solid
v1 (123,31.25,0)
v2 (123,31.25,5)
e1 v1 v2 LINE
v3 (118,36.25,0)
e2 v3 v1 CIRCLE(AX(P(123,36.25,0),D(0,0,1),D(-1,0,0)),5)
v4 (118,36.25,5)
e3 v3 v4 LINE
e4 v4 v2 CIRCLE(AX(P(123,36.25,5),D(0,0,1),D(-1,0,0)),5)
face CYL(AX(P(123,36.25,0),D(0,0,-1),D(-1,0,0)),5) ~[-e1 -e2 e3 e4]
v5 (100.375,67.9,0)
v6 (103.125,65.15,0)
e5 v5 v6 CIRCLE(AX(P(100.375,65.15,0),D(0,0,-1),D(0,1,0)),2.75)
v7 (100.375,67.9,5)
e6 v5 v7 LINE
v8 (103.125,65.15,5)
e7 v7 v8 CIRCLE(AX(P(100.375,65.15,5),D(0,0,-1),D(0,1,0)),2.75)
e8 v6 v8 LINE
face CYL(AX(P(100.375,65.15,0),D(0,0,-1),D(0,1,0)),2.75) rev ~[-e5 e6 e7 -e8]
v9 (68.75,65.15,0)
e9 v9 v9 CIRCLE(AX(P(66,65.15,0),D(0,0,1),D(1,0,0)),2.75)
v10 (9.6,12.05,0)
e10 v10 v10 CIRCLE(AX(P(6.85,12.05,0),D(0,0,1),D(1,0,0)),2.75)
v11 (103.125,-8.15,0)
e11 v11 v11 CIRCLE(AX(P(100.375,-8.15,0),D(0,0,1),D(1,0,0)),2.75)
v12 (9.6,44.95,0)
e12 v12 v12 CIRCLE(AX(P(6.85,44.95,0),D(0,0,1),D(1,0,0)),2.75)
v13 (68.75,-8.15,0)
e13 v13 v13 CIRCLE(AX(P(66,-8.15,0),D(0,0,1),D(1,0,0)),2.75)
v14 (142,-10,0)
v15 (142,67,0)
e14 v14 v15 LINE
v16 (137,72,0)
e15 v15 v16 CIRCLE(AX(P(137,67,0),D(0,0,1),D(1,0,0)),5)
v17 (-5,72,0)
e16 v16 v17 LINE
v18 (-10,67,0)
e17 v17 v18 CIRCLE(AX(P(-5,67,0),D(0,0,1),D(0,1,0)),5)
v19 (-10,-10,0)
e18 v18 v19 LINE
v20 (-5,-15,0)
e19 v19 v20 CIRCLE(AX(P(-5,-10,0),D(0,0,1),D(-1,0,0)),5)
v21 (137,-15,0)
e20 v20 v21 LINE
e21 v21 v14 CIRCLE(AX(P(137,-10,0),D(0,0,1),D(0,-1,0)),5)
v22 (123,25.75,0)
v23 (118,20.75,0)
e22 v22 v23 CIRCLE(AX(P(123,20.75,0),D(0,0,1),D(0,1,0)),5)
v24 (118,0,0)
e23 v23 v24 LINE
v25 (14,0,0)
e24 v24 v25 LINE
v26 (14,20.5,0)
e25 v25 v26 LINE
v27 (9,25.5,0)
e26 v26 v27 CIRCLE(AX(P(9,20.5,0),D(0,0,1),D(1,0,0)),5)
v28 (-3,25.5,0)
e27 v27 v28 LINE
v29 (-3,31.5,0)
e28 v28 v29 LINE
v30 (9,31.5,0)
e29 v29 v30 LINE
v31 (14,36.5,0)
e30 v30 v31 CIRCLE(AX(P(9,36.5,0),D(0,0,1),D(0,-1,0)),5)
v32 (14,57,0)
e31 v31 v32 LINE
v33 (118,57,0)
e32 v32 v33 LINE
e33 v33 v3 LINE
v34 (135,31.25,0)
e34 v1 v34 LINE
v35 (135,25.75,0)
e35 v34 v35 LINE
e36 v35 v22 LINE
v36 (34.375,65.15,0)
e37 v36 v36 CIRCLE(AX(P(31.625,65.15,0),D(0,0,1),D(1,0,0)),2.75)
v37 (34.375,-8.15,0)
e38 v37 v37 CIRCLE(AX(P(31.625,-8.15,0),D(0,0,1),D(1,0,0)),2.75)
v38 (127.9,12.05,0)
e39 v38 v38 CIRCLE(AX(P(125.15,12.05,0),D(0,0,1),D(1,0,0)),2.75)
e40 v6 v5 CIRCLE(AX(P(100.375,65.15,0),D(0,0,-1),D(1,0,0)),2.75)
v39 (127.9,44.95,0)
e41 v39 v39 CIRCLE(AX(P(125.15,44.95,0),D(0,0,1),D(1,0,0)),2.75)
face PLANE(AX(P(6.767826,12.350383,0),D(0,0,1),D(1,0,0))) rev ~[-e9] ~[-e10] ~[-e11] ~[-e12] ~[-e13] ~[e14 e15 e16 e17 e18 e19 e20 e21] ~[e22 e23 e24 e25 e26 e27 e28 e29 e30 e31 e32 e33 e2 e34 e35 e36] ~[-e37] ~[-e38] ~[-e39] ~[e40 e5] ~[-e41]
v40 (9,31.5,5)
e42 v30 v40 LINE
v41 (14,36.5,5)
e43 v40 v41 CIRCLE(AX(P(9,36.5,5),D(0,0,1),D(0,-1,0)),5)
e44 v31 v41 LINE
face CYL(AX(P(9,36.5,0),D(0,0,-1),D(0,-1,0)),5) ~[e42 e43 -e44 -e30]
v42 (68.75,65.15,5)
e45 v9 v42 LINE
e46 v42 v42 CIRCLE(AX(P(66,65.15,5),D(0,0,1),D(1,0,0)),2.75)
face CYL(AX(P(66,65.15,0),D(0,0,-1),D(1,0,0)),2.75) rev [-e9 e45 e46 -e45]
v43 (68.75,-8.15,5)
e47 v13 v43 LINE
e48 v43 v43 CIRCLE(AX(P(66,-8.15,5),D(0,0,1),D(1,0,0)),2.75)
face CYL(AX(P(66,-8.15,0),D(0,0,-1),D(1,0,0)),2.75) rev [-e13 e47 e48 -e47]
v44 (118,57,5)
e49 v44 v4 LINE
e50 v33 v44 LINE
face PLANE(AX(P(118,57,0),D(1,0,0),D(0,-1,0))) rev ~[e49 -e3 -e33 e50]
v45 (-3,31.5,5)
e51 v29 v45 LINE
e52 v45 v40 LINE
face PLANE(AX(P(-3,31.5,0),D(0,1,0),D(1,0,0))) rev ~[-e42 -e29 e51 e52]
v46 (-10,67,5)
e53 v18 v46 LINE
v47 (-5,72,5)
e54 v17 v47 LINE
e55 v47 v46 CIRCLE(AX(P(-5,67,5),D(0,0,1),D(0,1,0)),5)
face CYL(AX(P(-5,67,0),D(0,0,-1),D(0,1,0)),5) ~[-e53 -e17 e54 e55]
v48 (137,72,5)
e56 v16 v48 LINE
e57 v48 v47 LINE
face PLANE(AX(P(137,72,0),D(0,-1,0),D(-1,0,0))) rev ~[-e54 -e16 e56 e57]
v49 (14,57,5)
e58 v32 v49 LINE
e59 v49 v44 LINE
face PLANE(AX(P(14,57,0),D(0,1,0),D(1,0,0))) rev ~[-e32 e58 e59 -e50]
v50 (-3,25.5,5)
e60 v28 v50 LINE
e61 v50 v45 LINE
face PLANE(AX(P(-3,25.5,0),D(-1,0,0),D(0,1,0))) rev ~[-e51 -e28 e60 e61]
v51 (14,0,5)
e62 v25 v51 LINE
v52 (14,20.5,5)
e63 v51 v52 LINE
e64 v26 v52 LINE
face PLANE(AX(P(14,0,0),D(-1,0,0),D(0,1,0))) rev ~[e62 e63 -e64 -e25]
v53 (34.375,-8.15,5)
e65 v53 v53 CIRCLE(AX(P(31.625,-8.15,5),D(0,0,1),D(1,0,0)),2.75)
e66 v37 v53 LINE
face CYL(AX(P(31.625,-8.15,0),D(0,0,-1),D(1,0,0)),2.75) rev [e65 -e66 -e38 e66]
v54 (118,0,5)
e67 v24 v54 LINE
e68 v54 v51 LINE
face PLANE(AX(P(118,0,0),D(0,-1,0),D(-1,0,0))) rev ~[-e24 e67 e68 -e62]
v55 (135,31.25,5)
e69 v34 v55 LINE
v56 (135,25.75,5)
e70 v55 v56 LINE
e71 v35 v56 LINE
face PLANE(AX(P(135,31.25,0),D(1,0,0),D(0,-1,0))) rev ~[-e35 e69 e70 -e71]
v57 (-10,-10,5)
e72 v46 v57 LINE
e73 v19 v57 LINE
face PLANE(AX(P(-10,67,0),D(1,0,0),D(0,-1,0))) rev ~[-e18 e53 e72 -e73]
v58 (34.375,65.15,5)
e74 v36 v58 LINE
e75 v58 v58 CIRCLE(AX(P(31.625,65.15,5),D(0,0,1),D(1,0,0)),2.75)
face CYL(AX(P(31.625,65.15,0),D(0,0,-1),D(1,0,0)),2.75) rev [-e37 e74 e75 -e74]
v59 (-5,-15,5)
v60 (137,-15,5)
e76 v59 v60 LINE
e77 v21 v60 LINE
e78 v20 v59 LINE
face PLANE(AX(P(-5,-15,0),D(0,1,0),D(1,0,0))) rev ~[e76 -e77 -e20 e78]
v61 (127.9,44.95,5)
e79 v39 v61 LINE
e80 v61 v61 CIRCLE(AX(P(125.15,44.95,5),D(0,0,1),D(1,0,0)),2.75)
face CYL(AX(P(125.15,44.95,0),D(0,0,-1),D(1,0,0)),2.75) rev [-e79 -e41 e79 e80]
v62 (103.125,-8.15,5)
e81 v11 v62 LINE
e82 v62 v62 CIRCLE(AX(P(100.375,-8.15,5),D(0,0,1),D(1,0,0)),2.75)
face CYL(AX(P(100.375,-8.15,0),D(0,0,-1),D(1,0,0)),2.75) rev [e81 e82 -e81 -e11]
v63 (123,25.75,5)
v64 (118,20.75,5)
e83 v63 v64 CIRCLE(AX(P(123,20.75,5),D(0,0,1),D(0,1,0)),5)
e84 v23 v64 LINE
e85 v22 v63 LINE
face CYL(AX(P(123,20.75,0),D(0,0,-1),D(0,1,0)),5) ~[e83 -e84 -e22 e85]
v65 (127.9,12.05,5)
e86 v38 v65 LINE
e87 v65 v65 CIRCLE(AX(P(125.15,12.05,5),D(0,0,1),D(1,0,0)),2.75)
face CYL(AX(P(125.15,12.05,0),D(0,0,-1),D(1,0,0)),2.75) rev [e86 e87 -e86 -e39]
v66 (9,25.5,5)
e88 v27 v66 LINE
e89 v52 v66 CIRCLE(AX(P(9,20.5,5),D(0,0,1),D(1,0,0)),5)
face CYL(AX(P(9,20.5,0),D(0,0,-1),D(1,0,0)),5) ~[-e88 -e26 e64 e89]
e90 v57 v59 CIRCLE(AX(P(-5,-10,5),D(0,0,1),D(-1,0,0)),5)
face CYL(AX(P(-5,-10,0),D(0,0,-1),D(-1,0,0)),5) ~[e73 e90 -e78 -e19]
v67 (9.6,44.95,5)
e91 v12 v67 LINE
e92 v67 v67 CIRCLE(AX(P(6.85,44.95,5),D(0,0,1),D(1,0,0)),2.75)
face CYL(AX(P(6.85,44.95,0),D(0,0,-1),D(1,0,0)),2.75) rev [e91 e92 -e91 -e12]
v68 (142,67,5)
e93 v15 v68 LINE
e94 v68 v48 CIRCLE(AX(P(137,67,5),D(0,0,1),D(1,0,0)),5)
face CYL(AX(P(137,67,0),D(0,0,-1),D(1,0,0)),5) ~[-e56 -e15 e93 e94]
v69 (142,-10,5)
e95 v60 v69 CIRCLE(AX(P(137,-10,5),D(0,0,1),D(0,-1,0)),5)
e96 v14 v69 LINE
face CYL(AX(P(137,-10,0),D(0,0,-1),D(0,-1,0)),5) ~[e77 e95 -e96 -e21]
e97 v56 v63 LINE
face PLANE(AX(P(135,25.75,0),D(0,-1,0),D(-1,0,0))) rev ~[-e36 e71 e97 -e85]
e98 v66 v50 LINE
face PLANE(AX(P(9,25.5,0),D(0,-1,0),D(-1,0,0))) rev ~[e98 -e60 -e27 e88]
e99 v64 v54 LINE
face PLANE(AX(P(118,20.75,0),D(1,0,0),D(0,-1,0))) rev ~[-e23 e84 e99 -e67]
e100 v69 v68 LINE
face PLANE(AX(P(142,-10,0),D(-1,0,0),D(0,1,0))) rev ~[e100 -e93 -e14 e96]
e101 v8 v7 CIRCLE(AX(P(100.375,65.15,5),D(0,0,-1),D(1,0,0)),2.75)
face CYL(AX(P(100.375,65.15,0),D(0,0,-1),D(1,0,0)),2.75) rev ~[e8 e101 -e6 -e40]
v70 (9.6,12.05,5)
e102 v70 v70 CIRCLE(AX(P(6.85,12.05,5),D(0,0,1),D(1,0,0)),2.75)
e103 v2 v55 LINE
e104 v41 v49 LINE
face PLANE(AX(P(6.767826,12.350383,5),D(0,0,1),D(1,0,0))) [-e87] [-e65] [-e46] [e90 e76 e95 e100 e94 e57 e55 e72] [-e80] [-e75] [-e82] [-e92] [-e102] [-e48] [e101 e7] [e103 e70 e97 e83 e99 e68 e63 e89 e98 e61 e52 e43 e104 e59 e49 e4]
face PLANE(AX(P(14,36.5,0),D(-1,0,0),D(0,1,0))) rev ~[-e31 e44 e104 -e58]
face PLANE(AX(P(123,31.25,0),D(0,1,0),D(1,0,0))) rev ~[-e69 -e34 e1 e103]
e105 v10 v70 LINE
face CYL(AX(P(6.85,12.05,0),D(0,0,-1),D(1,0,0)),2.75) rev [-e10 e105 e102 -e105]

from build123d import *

# Parameters (mm, degrees)
F0_R     = 2.75
F1_DEPTH = 5


with BuildPart() as f1:
    # F0 (on Top) → F1 (new body)
    with BuildSketch(Plane.XY):
        with BuildLine():
            Line((0, 25.5), (0, 0))
            Line((0, 0), (14, 0))
            Line((14, 0), (14, 20.5))
            ThreePointArc((14, 20.5), (12.5355339059, 24.0355339059), (9, 25.5))
            Line((9, 25.5), (0, 25.5))
        make_face()
        with Locations((6.85, 12.05)):
            Circle(F0_R, mode=Mode.SUBTRACT)
        with BuildLine():
            Line((14, 0), (0, 0))
            Line((0, 0), (-10, 0))
            Line((-10, 0), (-10, -10))
            ThreePointArc((-10, -10), (-8.5355339059, -13.5355339059), (-5, -15))
            Line((-5, -15), (0, -15))
            Line((0, -15), (132, -15))
            Line((132, -15), (132, 0))
            Line((132, 0), (118, 0))
            Line((118, 0), (14, 0))
        make_face()
        with Locations((31.625, -8.15)):
            Circle(F0_R, mode=Mode.SUBTRACT)
        with Locations((66, -8.15)):
            Circle(F0_R, mode=Mode.SUBTRACT)
        with Locations((100.375, -8.15)):
            Circle(F0_R, mode=Mode.SUBTRACT)
        Polygon((-10, 0), (0, 0), (0, 25.5), (-3, 25.5), (-3, 28.5), (-3, 31.5), (0, 31.5), (0, 57), (-10, 57), align=None)
        with BuildLine():
            Line((118, 20.75), (118, 0))
            Line((118, 0), (132, 0))
            Line((132, 0), (132, 25.75))
            Line((132, 25.75), (123, 25.75))
            ThreePointArc((123, 25.75), (119.4644660941, 24.2855339059), (118, 20.75))
        make_face()
        with Locations((125.15, 12.05)):
            Circle(F0_R, mode=Mode.SUBTRACT)
        with BuildLine():
            Line((-10, 67), (-10, 57))
            Line((-10, 57), (0, 57))
            Line((0, 57), (0, 72))
            Line((0, 72), (-5, 72))
            ThreePointArc((-5, 72), (-8.5355339059, 70.5355339059), (-10, 67))
        make_face()
        with BuildLine():
            Line((0, 57), (0, 31.5))
            Line((0, 31.5), (9, 31.5))
            ThreePointArc((9, 31.5), (12.5355339059, 32.9644660941), (14, 36.5))
            Line((14, 36.5), (14, 57))
            Line((14, 57), (0, 57))
        make_face()
        with Locations((6.85, 44.95)):
            Circle(F0_R, mode=Mode.SUBTRACT)
        with BuildLine():
            Line((142, 0), (132, 0))
            Line((132, 0), (132, -15))
            Line((132, -15), (137, -15))
            ThreePointArc((137, -15), (140.5355339059, -13.5355339059), (142, -10))
            Line((142, -10), (142, 0))
        make_face()
        Polygon((132, 25.75), (132, 0), (142, 0), (142, 57), (132, 57), (132, 31.25), (135, 31.25), (135, 28.25), (135, 25.75), align=None)
        Polygon((0, 72), (0, 57), (14, 57), (118, 57), (132, 57), (132, 72), (100.375, 72), align=None)
        with Locations((31.625, 65.15)):
            Circle(F0_R, mode=Mode.SUBTRACT)
        with Locations((66, 65.15)):
            Circle(F0_R, mode=Mode.SUBTRACT)
        with BuildLine():
            ThreePointArc((103.125, 65.15), (98.4304563517, 63.2054563517), (100.375, 67.9))
            ThreePointArc((100.375, 67.9), (102.3195436483, 67.0945436483), (103.125, 65.15))
        make_face(mode=Mode.SUBTRACT)
        with BuildLine():
            Line((123, 31.25), (132, 31.25))
            Line((132, 31.25), (132, 57))
            Line((132, 57), (118, 57))
            Line((118, 57), (118, 36.25))
            ThreePointArc((118, 36.25), (119.4644660941, 32.7144660941), (123, 31.25))
        make_face()
        with Locations((125.15, 44.95)):
            Circle(F0_R, mode=Mode.SUBTRACT)
        with BuildLine():
            Line((132, 57), (142, 57))
            Line((142, 57), (142, 67))
            ThreePointArc((142, 67), (140.5355339059, 70.5355339059), (137, 72))
            Line((137, 72), (132, 72))
            Line((132, 72), (132, 57))
        make_face()
    extrude(amount=F1_DEPTH)


solid = f1.part
